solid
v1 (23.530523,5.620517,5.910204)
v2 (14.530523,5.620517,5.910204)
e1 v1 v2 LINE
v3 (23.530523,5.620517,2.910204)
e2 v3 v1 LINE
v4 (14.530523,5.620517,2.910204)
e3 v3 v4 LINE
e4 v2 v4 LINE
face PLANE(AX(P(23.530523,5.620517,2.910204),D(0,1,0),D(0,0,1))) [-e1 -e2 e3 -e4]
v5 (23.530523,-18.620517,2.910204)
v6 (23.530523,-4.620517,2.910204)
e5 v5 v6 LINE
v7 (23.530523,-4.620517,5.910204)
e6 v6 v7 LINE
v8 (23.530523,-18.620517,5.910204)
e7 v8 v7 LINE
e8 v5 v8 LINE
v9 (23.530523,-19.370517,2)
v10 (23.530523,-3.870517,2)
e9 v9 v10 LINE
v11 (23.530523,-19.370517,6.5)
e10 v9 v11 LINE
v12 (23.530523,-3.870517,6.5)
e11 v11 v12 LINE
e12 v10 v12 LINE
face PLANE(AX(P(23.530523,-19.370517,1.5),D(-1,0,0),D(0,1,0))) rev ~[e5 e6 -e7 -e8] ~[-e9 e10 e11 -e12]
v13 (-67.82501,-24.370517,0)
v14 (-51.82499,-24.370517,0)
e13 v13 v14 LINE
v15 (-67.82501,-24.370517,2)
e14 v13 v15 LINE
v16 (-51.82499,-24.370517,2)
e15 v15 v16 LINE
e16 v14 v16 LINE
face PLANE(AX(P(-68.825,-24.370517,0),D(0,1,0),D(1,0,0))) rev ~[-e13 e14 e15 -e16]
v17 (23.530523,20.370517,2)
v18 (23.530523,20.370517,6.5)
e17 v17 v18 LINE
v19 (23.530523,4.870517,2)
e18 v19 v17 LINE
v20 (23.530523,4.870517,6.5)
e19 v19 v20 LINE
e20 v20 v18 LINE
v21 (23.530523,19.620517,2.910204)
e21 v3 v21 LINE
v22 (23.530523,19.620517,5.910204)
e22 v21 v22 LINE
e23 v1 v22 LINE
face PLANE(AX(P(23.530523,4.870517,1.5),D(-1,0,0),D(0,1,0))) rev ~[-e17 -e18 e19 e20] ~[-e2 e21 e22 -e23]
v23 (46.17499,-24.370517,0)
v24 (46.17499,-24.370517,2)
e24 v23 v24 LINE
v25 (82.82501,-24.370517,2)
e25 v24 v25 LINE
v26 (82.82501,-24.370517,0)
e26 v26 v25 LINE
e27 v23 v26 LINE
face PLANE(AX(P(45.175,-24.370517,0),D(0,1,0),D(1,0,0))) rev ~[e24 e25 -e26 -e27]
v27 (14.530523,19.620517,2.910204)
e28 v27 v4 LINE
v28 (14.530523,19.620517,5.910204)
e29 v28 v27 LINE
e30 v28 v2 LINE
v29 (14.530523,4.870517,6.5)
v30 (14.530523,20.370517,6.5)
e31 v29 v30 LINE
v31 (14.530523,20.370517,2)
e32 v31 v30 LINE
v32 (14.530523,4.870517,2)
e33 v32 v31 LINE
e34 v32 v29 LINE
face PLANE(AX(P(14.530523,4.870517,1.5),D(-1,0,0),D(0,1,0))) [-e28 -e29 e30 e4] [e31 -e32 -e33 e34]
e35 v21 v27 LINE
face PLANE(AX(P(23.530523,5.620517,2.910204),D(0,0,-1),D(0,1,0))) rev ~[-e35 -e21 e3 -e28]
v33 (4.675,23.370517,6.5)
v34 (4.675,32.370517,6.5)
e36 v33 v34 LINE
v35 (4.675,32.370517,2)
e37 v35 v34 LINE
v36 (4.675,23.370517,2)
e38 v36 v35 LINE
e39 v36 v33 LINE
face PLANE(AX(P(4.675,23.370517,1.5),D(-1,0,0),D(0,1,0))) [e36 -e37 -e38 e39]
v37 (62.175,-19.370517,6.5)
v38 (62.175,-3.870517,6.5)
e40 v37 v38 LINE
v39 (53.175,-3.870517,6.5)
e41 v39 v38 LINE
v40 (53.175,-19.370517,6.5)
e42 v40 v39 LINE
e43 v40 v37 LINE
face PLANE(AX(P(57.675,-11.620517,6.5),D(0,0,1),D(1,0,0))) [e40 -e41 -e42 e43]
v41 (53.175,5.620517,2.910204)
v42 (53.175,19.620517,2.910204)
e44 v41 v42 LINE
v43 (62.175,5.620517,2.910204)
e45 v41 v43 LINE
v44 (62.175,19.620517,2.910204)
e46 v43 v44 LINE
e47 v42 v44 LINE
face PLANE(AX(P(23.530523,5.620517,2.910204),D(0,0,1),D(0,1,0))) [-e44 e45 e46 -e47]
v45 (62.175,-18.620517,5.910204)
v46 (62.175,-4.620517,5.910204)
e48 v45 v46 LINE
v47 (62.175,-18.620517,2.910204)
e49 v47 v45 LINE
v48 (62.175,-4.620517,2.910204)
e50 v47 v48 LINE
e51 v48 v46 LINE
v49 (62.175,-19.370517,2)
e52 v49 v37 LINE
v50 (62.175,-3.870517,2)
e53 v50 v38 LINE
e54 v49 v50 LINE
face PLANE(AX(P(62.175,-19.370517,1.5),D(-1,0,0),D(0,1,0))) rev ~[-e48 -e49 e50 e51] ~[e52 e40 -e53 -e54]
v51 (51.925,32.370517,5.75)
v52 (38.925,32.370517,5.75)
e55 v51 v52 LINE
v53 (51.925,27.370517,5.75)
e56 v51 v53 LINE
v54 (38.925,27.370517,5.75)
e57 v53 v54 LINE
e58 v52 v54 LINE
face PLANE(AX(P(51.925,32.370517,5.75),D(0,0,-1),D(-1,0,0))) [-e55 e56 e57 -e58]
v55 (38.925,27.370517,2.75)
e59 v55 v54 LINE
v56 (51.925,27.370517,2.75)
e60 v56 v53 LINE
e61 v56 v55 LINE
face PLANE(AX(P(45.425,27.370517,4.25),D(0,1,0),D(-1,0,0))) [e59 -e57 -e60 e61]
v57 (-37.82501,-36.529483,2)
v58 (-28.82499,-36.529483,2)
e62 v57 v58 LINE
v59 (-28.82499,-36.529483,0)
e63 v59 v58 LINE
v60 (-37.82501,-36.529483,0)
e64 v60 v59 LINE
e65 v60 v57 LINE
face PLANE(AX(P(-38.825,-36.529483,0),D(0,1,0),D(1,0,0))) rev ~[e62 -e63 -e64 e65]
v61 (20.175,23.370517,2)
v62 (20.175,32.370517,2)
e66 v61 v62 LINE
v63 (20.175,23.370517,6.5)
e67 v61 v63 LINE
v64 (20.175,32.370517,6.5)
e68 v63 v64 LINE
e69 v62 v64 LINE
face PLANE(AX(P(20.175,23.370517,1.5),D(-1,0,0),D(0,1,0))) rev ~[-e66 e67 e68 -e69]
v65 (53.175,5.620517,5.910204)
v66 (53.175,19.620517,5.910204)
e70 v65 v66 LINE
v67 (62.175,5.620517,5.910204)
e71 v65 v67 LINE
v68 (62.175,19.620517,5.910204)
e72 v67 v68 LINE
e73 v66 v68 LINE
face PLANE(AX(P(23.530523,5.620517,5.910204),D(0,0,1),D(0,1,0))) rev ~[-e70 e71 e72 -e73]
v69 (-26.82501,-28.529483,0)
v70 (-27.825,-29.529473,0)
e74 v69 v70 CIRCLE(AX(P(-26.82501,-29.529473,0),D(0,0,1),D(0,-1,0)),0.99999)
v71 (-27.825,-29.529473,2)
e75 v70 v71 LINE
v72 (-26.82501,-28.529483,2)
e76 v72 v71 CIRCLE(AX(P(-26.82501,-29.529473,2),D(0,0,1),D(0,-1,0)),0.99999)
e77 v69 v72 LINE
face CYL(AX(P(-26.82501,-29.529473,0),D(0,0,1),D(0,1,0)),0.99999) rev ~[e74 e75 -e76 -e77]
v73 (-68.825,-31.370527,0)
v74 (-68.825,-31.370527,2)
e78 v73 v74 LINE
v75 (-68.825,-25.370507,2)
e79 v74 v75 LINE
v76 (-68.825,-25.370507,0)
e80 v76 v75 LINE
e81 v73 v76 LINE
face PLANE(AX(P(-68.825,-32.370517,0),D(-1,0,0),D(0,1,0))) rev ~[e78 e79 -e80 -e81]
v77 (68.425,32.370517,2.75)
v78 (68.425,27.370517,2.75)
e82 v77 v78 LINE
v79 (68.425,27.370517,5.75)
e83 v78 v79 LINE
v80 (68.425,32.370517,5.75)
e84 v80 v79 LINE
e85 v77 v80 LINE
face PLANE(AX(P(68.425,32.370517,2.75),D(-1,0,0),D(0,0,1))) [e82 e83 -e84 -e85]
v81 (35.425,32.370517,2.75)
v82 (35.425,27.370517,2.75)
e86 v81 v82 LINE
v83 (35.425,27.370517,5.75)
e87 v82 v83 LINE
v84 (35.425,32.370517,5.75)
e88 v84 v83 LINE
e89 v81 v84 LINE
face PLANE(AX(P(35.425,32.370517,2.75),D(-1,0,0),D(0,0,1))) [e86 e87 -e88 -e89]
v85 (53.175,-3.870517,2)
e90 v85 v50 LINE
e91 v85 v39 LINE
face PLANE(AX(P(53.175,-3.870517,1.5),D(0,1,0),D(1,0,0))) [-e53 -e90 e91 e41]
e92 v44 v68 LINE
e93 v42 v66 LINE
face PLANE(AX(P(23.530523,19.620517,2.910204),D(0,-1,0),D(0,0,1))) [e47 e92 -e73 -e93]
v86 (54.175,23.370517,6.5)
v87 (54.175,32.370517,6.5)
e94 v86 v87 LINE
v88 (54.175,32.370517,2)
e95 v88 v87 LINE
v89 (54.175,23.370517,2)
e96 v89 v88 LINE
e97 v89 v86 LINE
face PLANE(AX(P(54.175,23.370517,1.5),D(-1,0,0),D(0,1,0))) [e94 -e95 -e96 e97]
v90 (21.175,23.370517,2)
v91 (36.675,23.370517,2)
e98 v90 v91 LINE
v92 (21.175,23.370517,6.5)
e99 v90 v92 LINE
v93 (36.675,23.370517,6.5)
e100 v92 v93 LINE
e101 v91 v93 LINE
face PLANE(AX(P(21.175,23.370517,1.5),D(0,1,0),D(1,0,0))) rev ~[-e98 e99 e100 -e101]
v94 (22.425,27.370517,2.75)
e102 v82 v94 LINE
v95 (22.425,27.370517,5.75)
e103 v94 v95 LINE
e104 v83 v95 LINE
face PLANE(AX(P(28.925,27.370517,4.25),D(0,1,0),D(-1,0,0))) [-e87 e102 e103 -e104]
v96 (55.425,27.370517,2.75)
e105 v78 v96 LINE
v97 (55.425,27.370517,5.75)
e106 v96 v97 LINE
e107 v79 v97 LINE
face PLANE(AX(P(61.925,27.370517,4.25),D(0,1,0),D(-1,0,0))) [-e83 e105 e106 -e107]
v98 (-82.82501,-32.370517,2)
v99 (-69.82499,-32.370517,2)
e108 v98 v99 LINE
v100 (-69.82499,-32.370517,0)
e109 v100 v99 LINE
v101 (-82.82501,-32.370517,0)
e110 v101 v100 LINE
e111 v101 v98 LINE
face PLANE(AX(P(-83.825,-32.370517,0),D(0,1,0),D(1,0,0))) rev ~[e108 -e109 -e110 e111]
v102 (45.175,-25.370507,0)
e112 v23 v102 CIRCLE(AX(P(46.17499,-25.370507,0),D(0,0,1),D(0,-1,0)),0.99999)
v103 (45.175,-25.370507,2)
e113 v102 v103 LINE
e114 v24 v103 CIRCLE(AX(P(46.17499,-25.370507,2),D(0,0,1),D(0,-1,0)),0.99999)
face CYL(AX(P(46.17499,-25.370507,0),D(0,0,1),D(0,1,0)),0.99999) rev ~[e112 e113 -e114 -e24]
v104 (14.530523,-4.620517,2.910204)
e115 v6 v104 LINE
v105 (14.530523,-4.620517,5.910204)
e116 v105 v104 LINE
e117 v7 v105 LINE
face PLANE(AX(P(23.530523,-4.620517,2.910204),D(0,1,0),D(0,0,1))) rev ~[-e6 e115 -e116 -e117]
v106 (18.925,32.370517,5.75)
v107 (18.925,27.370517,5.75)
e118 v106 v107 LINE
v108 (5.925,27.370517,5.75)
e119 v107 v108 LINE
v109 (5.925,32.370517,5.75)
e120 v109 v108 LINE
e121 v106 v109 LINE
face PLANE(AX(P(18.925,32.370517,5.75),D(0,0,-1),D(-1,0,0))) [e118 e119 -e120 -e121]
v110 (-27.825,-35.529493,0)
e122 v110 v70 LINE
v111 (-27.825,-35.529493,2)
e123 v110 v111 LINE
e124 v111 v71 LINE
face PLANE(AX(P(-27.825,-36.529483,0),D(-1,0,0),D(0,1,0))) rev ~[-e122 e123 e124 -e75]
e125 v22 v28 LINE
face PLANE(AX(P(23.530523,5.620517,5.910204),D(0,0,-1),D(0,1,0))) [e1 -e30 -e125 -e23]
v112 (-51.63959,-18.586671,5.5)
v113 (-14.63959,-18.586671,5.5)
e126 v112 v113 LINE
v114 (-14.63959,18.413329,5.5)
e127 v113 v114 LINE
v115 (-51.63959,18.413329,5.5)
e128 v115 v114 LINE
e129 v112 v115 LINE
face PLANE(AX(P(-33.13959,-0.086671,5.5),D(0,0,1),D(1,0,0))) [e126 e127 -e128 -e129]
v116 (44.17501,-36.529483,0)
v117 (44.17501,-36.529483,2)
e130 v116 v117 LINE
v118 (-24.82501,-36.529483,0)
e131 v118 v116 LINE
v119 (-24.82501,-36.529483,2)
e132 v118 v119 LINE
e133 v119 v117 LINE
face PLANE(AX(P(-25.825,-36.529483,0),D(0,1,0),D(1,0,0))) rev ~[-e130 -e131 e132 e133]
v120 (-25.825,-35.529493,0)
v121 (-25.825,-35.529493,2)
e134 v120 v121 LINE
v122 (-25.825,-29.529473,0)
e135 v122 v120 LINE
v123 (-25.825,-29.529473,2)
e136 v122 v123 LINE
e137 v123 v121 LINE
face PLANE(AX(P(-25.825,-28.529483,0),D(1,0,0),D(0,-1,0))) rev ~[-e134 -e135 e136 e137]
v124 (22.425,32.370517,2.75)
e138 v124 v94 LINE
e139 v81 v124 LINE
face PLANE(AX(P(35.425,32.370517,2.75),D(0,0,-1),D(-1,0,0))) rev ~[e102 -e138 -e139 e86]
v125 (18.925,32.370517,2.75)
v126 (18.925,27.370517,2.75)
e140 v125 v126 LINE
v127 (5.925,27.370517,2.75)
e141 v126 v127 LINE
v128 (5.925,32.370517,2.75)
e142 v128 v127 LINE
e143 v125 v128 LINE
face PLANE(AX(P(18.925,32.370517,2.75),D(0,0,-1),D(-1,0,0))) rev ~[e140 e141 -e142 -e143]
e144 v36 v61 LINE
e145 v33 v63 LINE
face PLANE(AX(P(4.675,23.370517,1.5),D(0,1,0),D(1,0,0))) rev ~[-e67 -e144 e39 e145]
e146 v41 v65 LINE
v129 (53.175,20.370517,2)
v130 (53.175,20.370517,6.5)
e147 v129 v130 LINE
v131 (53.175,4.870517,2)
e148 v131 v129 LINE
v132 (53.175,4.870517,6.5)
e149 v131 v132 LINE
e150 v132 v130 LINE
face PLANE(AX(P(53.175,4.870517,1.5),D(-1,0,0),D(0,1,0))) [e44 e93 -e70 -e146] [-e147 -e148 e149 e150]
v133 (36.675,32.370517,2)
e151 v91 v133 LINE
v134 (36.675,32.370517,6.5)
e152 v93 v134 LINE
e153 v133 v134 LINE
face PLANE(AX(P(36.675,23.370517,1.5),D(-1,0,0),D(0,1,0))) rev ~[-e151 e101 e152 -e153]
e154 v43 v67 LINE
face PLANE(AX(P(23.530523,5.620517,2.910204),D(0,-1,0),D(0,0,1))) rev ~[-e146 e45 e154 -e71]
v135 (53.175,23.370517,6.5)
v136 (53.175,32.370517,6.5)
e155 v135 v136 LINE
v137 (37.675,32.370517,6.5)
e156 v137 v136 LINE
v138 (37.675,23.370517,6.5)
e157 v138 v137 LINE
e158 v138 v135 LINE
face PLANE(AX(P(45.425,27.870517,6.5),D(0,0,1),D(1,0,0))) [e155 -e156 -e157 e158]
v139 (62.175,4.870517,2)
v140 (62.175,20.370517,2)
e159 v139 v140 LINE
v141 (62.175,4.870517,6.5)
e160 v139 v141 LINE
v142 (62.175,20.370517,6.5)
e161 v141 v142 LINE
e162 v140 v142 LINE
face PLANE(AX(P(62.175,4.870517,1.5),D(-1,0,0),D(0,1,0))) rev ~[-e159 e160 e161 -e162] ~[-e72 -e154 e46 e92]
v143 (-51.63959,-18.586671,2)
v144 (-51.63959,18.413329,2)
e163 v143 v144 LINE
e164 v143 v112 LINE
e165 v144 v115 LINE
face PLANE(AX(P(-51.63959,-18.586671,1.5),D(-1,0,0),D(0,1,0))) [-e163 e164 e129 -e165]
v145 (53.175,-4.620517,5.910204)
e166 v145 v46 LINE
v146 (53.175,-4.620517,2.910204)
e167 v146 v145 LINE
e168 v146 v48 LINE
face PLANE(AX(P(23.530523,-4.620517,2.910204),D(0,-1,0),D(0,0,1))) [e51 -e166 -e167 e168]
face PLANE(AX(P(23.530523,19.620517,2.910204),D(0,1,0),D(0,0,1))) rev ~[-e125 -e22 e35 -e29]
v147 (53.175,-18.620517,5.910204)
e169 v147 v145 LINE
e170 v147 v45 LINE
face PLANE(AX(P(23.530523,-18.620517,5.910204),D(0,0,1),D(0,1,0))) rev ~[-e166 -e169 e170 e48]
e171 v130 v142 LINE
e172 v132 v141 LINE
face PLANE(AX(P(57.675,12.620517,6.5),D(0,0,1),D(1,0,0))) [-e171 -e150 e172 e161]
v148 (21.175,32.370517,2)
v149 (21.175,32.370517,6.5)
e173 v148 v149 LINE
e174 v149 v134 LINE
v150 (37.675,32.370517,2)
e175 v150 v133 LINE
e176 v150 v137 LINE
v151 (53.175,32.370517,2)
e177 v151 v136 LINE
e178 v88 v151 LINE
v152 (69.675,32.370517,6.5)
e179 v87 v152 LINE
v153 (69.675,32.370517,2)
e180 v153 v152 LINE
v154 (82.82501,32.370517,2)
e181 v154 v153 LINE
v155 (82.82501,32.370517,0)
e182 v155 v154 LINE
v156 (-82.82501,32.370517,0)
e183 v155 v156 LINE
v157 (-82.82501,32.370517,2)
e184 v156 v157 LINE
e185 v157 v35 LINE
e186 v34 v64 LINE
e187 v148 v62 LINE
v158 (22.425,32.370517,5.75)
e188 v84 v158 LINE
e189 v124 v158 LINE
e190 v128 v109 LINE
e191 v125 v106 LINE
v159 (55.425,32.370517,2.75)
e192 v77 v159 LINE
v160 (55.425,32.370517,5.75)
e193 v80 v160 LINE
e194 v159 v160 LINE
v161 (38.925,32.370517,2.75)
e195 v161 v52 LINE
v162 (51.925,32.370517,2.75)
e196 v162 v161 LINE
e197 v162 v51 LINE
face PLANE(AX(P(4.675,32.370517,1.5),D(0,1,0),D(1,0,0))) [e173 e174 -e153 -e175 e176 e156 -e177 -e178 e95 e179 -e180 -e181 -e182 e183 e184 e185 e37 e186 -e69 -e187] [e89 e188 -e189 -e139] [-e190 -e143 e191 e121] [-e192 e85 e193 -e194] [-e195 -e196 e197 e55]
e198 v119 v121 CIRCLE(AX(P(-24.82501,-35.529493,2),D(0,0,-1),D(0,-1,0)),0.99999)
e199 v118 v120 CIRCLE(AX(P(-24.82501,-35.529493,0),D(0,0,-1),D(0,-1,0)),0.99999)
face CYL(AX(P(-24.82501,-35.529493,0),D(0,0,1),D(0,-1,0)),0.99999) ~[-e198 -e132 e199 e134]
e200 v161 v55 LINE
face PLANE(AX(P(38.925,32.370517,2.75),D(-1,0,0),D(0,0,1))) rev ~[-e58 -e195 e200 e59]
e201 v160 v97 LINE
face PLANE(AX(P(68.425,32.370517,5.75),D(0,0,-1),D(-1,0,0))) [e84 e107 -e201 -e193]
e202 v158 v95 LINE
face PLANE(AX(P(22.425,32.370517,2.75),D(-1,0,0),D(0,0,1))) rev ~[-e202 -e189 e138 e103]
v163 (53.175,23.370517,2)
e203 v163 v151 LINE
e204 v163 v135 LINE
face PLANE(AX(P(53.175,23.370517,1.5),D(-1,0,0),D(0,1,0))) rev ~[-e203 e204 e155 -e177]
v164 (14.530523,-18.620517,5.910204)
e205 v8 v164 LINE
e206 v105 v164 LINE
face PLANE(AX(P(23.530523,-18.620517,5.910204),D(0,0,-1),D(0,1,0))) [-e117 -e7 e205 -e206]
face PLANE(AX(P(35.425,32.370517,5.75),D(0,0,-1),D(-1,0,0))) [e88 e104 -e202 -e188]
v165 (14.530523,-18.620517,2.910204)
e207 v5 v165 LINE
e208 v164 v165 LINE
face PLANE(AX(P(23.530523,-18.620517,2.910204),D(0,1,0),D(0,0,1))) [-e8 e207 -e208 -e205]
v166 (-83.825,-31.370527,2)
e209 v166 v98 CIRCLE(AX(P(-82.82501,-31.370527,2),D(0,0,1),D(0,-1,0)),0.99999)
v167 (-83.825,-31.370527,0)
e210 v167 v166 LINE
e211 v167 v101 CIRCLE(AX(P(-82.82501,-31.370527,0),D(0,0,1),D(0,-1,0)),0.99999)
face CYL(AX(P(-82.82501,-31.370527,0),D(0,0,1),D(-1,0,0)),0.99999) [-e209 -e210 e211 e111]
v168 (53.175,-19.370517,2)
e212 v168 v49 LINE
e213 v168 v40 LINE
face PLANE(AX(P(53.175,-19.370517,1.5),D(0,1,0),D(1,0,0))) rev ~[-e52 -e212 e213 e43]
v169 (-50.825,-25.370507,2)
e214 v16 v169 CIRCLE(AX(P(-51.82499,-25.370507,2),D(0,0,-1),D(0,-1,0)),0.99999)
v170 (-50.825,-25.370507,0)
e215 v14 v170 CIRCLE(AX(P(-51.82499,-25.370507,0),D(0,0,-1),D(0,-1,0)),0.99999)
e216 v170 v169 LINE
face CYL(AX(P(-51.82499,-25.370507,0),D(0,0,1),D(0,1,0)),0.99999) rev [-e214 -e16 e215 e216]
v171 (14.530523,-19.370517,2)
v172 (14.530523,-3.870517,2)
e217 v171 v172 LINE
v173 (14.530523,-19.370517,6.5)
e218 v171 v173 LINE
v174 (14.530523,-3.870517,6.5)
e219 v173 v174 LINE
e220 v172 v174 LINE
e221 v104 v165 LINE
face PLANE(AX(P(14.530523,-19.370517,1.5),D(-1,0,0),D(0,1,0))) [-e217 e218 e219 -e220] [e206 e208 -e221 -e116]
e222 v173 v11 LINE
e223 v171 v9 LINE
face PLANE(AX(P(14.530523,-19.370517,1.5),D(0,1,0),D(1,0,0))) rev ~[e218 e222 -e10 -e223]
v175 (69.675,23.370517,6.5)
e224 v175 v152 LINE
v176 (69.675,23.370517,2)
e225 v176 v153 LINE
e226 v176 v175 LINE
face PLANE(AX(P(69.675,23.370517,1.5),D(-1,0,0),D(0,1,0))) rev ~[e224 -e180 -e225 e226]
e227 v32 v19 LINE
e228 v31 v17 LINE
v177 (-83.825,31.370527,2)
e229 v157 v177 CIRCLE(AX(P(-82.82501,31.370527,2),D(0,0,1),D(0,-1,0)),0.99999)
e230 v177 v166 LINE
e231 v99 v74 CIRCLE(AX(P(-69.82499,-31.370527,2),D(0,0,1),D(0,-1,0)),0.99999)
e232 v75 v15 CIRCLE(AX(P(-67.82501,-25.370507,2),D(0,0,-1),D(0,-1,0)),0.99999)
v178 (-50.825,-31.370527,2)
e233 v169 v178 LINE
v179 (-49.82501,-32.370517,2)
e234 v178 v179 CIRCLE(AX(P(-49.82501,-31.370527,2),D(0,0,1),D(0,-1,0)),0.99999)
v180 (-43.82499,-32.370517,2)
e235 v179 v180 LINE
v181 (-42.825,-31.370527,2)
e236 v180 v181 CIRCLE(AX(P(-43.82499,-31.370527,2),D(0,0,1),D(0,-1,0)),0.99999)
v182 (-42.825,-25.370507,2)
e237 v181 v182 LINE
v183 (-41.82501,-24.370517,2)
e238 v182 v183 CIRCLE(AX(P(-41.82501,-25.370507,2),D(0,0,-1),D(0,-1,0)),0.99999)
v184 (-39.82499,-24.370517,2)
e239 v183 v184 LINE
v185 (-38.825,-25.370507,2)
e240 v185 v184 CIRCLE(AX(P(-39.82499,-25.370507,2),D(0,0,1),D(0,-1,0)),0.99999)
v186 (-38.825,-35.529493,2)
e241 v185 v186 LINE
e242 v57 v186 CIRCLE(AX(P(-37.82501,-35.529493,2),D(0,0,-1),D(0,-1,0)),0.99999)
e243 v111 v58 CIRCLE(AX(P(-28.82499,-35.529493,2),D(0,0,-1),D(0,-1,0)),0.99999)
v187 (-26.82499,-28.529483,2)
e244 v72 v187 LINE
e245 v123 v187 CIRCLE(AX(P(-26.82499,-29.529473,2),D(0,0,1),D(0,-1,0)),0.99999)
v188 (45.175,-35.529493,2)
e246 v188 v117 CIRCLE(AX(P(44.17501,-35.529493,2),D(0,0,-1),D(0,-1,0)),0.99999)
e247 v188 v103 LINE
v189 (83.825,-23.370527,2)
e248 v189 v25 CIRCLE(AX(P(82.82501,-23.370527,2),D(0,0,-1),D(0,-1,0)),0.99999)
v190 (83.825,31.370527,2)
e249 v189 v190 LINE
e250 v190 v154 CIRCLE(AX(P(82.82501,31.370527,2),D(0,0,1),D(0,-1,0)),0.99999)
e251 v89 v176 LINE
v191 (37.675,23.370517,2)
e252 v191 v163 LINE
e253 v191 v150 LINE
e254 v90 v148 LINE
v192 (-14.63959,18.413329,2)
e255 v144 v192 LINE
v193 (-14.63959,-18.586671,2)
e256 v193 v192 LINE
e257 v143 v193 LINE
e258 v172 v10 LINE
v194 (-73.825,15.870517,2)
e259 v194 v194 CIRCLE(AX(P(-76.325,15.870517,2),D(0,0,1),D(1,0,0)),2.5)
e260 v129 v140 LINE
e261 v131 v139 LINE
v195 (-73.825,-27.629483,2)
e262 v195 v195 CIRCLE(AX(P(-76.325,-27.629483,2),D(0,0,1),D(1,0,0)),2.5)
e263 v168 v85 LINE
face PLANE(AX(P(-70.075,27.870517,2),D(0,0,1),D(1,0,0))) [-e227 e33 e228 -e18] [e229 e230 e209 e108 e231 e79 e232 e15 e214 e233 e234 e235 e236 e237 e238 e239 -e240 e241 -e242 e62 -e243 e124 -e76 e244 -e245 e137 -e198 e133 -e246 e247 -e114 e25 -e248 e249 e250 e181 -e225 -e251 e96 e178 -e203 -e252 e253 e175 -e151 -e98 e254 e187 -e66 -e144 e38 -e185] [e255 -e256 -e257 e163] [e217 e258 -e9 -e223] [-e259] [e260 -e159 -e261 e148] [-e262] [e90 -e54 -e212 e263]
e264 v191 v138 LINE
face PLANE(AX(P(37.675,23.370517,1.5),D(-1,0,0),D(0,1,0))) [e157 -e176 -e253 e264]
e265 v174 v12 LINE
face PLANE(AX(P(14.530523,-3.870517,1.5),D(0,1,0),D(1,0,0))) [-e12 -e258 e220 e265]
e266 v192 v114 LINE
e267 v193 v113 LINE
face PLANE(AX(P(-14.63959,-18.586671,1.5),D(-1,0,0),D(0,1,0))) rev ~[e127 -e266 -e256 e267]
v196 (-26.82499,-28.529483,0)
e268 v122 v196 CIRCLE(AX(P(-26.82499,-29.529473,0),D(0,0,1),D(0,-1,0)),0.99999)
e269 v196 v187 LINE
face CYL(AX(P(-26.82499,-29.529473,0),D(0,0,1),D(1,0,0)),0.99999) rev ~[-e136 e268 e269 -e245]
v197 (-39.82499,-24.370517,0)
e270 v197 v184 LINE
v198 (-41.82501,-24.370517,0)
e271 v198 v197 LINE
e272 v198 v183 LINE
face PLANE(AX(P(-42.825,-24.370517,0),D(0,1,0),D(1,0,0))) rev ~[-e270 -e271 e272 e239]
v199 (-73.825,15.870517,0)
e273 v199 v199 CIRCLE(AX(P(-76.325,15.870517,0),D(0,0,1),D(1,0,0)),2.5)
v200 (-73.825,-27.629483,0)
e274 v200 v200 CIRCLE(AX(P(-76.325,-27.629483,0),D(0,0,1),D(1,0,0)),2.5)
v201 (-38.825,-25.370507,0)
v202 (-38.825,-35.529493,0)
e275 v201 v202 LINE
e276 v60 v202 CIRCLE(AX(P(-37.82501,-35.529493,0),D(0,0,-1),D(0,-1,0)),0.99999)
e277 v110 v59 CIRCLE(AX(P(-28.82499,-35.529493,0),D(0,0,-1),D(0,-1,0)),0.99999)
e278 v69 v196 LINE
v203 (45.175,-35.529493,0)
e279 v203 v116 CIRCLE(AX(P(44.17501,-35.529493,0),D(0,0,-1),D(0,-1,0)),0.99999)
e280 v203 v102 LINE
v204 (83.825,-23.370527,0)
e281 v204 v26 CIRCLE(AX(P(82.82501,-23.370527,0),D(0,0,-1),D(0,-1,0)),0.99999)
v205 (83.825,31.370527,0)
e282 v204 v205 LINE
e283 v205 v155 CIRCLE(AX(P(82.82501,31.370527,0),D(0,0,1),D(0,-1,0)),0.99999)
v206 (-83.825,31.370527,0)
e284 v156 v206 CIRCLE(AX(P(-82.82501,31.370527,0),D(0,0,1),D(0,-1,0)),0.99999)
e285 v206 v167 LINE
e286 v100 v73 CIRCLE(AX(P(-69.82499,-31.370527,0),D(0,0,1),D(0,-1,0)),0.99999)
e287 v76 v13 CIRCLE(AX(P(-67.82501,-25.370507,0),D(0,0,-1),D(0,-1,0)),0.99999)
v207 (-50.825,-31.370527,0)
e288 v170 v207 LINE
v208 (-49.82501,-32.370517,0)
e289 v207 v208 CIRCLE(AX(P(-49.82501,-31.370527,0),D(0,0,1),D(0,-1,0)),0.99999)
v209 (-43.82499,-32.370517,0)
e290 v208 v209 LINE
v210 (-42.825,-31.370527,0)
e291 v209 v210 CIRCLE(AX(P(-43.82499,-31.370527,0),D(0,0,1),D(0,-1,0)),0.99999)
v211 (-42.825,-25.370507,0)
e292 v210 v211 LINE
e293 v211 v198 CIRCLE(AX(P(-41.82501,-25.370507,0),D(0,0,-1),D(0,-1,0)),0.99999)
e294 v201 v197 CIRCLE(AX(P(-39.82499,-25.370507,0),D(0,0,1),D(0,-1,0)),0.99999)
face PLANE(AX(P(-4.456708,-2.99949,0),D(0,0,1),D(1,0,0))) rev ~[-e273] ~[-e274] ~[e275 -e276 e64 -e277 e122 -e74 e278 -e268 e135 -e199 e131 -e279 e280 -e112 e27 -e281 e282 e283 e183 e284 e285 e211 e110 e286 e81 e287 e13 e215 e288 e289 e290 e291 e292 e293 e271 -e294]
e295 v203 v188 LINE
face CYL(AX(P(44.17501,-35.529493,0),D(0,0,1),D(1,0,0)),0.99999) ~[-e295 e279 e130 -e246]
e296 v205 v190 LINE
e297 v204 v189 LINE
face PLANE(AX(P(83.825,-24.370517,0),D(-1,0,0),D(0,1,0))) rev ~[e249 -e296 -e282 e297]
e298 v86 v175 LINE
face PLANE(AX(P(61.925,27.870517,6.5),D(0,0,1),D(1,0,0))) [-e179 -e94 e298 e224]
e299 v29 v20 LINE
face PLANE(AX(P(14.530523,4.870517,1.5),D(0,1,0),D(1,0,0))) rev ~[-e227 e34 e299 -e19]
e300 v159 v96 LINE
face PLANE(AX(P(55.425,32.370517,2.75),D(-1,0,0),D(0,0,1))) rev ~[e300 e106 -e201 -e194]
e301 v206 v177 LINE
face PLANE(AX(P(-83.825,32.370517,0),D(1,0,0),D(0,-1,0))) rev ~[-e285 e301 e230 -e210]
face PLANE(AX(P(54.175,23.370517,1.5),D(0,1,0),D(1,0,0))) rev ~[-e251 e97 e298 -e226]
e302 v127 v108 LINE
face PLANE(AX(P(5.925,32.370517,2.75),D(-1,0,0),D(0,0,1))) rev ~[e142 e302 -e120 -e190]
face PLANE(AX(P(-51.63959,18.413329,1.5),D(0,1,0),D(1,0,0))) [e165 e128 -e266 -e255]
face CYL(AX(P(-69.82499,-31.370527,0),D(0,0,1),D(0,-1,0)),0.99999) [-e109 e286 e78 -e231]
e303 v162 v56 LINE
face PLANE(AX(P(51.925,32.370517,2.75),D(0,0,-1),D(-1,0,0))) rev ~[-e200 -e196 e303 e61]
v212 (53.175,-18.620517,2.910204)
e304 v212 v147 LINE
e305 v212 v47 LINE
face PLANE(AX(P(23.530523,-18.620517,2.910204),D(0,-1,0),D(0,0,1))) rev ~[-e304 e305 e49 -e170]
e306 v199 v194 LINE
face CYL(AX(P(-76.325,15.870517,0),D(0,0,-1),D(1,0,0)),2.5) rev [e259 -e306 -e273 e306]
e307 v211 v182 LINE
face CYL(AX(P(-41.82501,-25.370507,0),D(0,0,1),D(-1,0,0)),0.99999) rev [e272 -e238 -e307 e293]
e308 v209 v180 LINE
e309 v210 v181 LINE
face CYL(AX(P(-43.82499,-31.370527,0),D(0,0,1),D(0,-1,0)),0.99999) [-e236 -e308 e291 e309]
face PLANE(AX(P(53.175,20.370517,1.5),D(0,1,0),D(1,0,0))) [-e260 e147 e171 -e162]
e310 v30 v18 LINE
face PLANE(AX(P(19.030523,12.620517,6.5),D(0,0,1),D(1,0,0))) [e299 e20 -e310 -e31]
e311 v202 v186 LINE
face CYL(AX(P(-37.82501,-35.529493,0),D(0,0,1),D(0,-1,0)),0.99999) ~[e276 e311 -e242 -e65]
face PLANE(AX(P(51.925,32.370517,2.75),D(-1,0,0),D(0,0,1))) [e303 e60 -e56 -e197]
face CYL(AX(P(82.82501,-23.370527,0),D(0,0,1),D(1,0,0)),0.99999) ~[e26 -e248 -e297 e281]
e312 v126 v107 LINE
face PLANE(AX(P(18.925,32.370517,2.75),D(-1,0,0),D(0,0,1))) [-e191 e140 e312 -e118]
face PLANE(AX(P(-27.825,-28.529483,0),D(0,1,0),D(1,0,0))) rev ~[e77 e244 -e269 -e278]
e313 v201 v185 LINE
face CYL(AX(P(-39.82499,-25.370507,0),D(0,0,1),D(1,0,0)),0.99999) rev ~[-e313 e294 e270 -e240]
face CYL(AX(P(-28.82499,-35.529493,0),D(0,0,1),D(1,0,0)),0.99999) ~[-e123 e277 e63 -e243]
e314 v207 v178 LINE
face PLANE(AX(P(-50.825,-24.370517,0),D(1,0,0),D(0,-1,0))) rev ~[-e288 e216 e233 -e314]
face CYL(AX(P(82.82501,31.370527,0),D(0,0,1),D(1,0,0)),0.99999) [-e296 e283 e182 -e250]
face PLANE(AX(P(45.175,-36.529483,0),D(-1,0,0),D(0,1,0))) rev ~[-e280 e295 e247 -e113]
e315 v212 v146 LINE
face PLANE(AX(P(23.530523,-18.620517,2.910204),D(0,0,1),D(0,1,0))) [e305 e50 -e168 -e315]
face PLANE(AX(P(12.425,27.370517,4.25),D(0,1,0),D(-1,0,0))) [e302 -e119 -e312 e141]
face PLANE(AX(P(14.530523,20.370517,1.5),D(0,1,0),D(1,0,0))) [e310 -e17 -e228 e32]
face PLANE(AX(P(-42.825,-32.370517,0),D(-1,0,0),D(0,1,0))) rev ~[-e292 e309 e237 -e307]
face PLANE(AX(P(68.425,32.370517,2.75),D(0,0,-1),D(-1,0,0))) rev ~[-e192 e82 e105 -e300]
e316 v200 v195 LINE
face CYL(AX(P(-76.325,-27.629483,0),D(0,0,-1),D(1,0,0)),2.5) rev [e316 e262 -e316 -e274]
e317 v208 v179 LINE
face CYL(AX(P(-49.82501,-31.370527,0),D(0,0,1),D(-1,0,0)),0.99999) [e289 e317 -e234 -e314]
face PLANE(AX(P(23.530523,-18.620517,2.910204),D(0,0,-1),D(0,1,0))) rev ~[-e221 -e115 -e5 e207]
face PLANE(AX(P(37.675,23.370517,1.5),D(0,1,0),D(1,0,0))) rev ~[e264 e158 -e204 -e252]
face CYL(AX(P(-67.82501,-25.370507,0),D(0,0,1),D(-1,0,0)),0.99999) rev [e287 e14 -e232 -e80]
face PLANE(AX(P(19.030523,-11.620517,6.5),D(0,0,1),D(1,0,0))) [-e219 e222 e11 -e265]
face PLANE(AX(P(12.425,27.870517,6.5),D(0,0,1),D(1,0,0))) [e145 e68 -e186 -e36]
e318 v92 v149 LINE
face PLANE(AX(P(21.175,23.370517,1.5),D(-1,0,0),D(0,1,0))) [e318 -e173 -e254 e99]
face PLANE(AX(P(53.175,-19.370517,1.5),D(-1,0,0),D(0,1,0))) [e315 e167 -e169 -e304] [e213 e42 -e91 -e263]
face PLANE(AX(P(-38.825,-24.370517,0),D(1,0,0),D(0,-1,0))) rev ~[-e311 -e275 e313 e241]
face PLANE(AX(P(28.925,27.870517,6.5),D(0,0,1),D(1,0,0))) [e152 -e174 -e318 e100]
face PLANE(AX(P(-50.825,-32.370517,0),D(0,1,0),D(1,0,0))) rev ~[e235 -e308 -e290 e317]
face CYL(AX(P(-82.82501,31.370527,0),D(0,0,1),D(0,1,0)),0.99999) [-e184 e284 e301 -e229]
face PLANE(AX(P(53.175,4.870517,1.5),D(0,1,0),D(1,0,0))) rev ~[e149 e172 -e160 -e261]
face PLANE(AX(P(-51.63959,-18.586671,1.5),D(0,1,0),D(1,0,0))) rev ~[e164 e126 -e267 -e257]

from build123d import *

# Parameters (mm, degrees)
F0_R          = 2.5
F1_DEPTH      = 2
F3_R          = 0.99999
F2_W          = 15.5
F2_H          = 9
F2_W_2        = 9
F2_H_2        = 15.5
F2_W_3        = 37
F2_H_3        = 37
F4_DEPTH      = 0.5
F5_DEPTH      = 0.5
F6_DEPTH      = 5
F7_W          = 14
F7_H          = 3
F8_DEPTH      = 107.3565227488
F8_DEPTH_BACK = 60.2954772512
F9_W          = 13
F9_H          = 3
F10_DEPTH     = 5
F11_DEPTH     = 4


# Not quite as in the source:
# - a fillet or chamfer is up to 0.001 mm smaller than in the source, because OpenCascade refuses the exact size


with BuildPart() as f1:
    # F0 (on Top) → F1 (new body)
    with BuildSketch(Plane.XY):
        Polygon((83.825, -24.3705166107), (83.825, 32.3705166107), (-83.825, 32.3705166107), (-83.825, -32.3705166107), (-68.825, -32.3705166107), (-68.825, -24.3705166107), (-50.825, -24.3705166107), (-50.825, -32.3705166107), (-42.825, -32.3705166107), (-42.825, -24.3705166107), (-38.825, -24.3705166107), (-38.825, -36.5294833893), (-27.825, -36.5294833893), (-27.825, -28.5294833893), (-25.825, -28.5294833893), (-25.825, -36.5294833893), (45.175, -36.5294833893), (45.175, -24.3705166107), align=None)
        with Locations((-76.325, -27.6294833893)):
            Circle(F0_R, mode=Mode.SUBTRACT)
        with Locations((-76.325, 15.8705166107)):
            Circle(F0_R, mode=Mode.SUBTRACT)
    extrude(amount=F1_DEPTH)

    # F3 (radius 1 in the source; OpenCascade refuses exactly that, so slightly less here)
    f3_edges = [f1.edges().sort_by_distance(p)[0] for p in [
        (-83.825, -32.370517, 1),
        (-68.825, -32.370517, 1),
        (-68.825, -24.370517, 1),
        (-50.825, -32.370517, 1),
        (-42.825, -32.370517, 1),
        (-42.825, -24.370517, 1),
        (-38.825, -36.529483, 1),
        (-27.825, -36.529483, 1),
        (-27.825, -28.529483, 1),
        (-25.825, -36.529483, 1),
        (83.825, -24.370517, 1),
        (45.175, -24.370517, 1),
        (45.175, -36.529483, 1),
        (83.825, 32.370517, 1),
        (-83.825, 32.370517, 1),
        (-50.825, -24.370517, 1),
        (-38.825, -24.370517, 1),
        (-25.825, -28.529483, 1),
    ]]
    fillet(f3_edges, radius=F3_R)

    # F2 (on face) → F4 (cut)
    with BuildSketch(Plane.XY.offset(2)):
        with Locations((-70.075, 27.8705166107)):
            Rectangle(F2_W, F2_H)
        with Locations((-53.575, 27.8705166107)):
            Rectangle(F2_W, F2_H)
        with Locations((-37.075, 27.8705166107)):
            Rectangle(F2_W, F2_H)
        with Locations((-20.575, 27.8705166107)):
            Rectangle(F2_W, F2_H)
        with Locations((-4.075, 27.8705166107)):
            Rectangle(F2_W, F2_H)
        with Locations((12.425, 27.8705166107)):
            Rectangle(F2_W, F2_H)
        with Locations((28.925, 27.8705166107)):
            Rectangle(F2_W, F2_H)
        with Locations((45.425, 27.8705166107)):
            Rectangle(F2_W, F2_H)
        with Locations((61.925, 27.8705166107)):
            Rectangle(F2_W, F2_H)
        with Locations((57.675, 12.6205166107)):
            Rectangle(F2_W_2, F2_H_2)
        with Locations((57.675, -11.6205166107)):
            Rectangle(F2_W_2, F2_H_2)
        with Locations((19.0305227488, 12.6205166107)):
            Rectangle(F2_W_2, F2_H_2)
        with Locations((19.0305227488, -11.6205166107)):
            Rectangle(F2_W_2, F2_H_2)
        with Locations((-33.1395904124, -0.086670503)):
            Rectangle(F2_W_3, F2_H_3)
    extrude(amount=-F4_DEPTH, mode=Mode.SUBTRACT)

    # F5 (add, through all): faces of the model
    f5_faces = [f1.faces().sort_by_distance(p)[0] for p in [
        (-70.075, 27.8705166107, 1.5),
        (-53.575, 27.8705166107, 1.5),
        (-37.075, 27.8705166107, 1.5),
        (-20.575, 27.8705166107, 1.5),
        (-4.075, 27.8705166107, 1.5),
    ]]
    extrude(f5_faces, amount=F5_DEPTH)

    # F6 (add): faces of the model
    f6_faces = [f1.faces().sort_by_distance(p)[0] for p in [
        (12.425, 27.8705166107, 1.5),
        (28.925, 27.8705166107, 1.5),
        (45.425, 27.8705166107, 1.5),
        (61.925, 27.8705166107, 1.5),
        (19.0305227488, 12.6205166107, 1.5),
        (57.675, 12.6205166107, 1.5),
        (19.0305227488, -11.6205166107, 1.5),
        (57.675, -11.6205166107, 1.5),
    ]]
    extrude(f6_faces, amount=F6_DEPTH)

    # F7 (on face) → F8 (cut, two sides)
    with BuildSketch(Plane.YZ.offset(23.5305227488)) as f8_sk:
        with Locations((-11.6205166107, 4.4102044776)):
            Rectangle(F7_W, F7_H)
        with Locations((12.6205166107, 4.4102044776)):
            Rectangle(F7_W, F7_H)
    extrude(amount=-F8_DEPTH, mode=Mode.SUBTRACT)
    extrude(f8_sk.sketch, amount=F8_DEPTH_BACK, mode=Mode.SUBTRACT)

    # F9 (on face) → F10 (cut)
    with BuildSketch(Plane(origin=(0, 32.3705166107, 0), x_dir=(-1, 0, 0), z_dir=(0, 1, 0))):
        with Locations((-12.425, 4.25)):
            Rectangle(F9_W, F9_H)
        with Locations((-28.925, 4.25)):
            Rectangle(F9_W, F9_H)
        with Locations((-45.425, 4.25)):
            Rectangle(F9_W, F9_H)
        with Locations((-61.925, 4.25)):
            Rectangle(F9_W, F9_H)
    extrude(amount=-F10_DEPTH, mode=Mode.SUBTRACT)

    # F11 (add): a face of the model
    f11_faces = [f1.faces().sort_by_distance(p)[0] for p in [
        (-33.1395904124, -0.086670503, 1.5),
    ]]
    extrude(f11_faces, amount=F11_DEPTH)


solid = f1.part
